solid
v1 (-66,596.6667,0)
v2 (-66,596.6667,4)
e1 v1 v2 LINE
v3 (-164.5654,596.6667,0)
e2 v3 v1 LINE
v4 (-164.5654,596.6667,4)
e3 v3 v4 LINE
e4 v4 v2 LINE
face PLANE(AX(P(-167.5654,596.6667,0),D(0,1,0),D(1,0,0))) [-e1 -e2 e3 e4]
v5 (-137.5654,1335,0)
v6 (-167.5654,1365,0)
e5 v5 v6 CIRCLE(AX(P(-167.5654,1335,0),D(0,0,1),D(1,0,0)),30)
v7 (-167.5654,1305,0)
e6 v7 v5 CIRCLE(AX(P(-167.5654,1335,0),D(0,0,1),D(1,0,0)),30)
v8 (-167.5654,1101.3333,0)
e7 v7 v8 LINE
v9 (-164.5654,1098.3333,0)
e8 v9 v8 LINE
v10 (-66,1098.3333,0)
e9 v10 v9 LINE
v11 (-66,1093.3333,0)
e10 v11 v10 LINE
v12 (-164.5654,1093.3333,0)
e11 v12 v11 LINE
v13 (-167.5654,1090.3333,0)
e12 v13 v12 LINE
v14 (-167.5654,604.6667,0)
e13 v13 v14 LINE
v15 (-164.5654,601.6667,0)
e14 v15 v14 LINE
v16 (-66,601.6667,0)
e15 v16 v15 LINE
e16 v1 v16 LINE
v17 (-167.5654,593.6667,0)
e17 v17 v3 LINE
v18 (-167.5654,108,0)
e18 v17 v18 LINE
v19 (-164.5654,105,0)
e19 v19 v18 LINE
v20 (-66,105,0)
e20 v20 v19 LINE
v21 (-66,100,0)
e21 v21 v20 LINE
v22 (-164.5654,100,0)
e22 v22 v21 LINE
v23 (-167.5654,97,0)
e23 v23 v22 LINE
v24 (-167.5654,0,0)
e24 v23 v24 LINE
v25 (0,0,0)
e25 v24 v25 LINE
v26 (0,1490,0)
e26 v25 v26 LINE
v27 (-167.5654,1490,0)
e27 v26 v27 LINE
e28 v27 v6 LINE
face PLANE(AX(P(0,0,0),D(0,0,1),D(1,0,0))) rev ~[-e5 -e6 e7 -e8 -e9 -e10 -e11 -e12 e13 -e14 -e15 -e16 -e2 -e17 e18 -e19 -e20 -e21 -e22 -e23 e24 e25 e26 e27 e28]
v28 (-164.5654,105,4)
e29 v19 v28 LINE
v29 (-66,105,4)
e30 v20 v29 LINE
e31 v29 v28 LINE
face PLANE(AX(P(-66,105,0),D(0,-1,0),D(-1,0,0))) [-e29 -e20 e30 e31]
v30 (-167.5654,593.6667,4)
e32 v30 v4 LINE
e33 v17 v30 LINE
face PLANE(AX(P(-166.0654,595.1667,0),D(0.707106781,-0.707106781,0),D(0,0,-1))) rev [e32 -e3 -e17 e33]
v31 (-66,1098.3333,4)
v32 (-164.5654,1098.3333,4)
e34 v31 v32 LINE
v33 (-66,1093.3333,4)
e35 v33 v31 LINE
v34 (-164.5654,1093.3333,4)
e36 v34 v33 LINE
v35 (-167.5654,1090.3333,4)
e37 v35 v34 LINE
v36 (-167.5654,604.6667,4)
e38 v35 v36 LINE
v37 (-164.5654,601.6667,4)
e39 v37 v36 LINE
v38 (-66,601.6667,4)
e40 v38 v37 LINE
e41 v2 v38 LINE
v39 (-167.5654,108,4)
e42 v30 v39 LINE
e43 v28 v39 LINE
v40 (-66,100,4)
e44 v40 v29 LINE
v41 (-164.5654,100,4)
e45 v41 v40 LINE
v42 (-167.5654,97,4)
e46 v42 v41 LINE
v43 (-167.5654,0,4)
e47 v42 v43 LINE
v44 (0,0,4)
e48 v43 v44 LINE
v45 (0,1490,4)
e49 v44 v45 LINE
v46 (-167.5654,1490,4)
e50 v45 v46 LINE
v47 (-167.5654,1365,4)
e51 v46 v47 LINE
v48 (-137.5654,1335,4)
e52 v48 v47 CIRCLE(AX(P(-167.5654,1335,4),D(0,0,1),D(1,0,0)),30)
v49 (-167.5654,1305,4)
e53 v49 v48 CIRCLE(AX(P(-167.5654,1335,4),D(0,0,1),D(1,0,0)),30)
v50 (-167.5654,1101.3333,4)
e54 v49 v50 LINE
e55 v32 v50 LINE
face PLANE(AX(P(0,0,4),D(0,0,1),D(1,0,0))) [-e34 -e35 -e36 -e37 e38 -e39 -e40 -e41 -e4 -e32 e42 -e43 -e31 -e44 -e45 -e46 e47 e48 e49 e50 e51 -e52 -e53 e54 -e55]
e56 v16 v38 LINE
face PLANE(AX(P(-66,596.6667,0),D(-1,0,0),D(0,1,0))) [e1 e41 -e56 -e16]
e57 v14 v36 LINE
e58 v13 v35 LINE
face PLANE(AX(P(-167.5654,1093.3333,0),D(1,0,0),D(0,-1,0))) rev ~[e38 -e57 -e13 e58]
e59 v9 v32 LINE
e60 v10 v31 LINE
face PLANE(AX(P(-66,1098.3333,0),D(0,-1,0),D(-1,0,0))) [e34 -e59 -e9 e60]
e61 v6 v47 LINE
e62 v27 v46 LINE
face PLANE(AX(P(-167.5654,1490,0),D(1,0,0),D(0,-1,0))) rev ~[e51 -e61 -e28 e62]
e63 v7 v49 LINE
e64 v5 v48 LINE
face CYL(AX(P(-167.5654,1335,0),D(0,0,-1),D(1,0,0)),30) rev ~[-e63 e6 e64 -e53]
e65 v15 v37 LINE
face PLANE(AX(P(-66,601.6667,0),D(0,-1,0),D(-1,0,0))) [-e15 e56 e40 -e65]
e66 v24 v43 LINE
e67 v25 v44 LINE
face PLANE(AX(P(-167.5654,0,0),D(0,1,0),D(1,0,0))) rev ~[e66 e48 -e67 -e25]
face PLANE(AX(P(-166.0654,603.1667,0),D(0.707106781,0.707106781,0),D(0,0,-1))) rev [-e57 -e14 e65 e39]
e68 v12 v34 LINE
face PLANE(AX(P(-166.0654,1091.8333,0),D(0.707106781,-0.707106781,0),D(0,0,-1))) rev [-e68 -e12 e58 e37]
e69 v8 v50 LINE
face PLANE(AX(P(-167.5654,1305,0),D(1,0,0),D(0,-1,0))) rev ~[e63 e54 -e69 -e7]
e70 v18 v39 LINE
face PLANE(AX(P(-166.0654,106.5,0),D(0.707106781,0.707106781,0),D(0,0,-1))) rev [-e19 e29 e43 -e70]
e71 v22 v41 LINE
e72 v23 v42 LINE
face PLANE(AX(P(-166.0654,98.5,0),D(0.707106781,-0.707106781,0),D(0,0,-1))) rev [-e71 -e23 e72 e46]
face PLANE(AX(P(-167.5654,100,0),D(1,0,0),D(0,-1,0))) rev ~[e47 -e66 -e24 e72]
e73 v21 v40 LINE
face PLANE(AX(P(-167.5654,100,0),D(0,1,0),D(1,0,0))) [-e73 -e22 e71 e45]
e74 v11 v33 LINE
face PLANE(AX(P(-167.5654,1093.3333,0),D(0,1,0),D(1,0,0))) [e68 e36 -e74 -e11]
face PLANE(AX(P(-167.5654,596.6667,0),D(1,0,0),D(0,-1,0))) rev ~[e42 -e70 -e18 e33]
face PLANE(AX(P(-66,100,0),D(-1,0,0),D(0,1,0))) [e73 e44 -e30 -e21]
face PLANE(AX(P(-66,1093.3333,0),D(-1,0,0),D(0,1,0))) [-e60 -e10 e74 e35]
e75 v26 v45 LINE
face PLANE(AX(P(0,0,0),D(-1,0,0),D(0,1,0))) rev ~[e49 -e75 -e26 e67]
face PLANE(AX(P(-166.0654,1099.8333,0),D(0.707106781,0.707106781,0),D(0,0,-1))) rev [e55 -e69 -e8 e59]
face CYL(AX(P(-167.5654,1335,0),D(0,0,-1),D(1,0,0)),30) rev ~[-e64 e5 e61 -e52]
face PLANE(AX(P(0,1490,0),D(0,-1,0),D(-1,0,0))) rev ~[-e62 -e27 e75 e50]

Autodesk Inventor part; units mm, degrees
ref_plane "YZ Plane" through (0, 0, 0) normal (1, 0, 0) x (0, 1, 0)
ref_plane "XZ Plane" through (0, 0, 0) normal (0, 1, 0) x (-1, 0, 0)
ref_plane "XY Plane" through (0, 0, 0) normal (0, 0, 1) x (1, 0, 0)
sketch "Sketch1" plane through (0, 0, 0) normal (0, 0, 1) x (1, 0, 0)
  line L0 (0, 1490) -> (-167.5654, 1490)
  line L1 (-167.5654, 1490) -> (-167.5654, 0)
  line L2 (-167.5654, 0) -> (0, 0)
  line L3 (0, 0) -> (0, 1490)
  line L4 (-167.5654, 100) -> (-66, 100)
  line L5 (-66, 100) -> (-66, 105)
  line L6 (-66, 105) -> (-167.5654, 105)
  line L7 (-167.5654, 105) -> (-167.5654, 100)
  line L8 (-167.5654, 596.6667) -> (-66, 596.6667)
  line L9 (-66, 596.6667) -> (-66, 601.6667)
  line L10 (-66, 601.6667) -> (-167.5654, 601.6667)
  line L11 (-167.5654, 601.6667) -> (-167.5654, 596.6667)
  line L12 (-167.5654, 1093.3333) -> (-66, 1093.3333)
  line L13 (-66, 1093.3333) -> (-66, 1098.3333)
  line L14 (-66, 1098.3333) -> (-167.5654, 1098.3333)
  line L15 (-167.5654, 1098.3333) -> (-167.5654, 1093.3333)
  circle A0 centre (-167.5654, 1335) radius 30
  point P0 (-167.5654, 1098.3333)
  point P1 (-167.5654, 1093.3333)
  point P2 (-167.5654, 596.6667)
  point P3 (-167.5654, 1365)
  point P4 (-167.5654, 1305)
  dimension "d0" = 1490
  dimension "d1" = 167.5654
  dimension "d2" = 5
  dimension "d4" = 100
  dimension "d7" = 496.6667
  dimension "d23" = 66
  dimension "d29" = 60
  dimension "d30" = 1335
extrude "Plate1" add sketch "Sketch1" along normal blind 4 contours L3 L2 L1 L4 L5 L6 L8 L9 L10 L12 L13 L14 A0 L0
chamfer "Corner Chamfer1" distance 3 angle 45 6 edges at (-167.5654, 100, 2) (-167.5654, 105, 2) (-167.5654, 596.6667, 2) (-167.5654, 601.6667, 2) (-167.5654, 1098.3333, 2) (-167.5654, 1093.3333, 2)
equation "\"d0\" = Стрингер_длина"
equation "\"d1\" = стрингер_глубина_3"
equation "\"d2\" = паз_под_стрингер_толщина"
equation "\"d7\" = Шаг_шпангоутов"
equation "\"d23\" = паз_под_стрингер_глубина - Thickness"
equation "\"d29\" = 2 * радиус_выреза_под_сварку"
equation "\"d12\" = Thickness"
equation "\"BendRadius\" = Thickness"
equation "\"BendReliefWidth\" = Thickness"
equation "\"BendReliefDepth\" = 0.5 * Thickness"
equation "\"CornerReliefSize\" = 4 * Thickness"
equation "\"MinimumRemnant\" = 2 * Thickness"
equation "\"TransitionRadius\" = BendRadius"
equation "\"JacobiRadiusSize\" = BendRadius"
equation "\"GapSize\" = Thickness"
equation "\"Стрингер_длина\" = 1490"
equation "\"стрингер_глубина_3\" = 167.565356"
equation "\"паз_под_стрингер_толщина\" = 5"
equation "\"Шаг_шпангоутов\" = 496.666667"
equation "\"паз_под_стрингер_глубина\" = 70"
equation "\"Thickness\" = 4"
equation "\"радиус_выреза_под_сварку\" = 30"
properties part number "GBK 3104 stringer 3" material "Steel"
